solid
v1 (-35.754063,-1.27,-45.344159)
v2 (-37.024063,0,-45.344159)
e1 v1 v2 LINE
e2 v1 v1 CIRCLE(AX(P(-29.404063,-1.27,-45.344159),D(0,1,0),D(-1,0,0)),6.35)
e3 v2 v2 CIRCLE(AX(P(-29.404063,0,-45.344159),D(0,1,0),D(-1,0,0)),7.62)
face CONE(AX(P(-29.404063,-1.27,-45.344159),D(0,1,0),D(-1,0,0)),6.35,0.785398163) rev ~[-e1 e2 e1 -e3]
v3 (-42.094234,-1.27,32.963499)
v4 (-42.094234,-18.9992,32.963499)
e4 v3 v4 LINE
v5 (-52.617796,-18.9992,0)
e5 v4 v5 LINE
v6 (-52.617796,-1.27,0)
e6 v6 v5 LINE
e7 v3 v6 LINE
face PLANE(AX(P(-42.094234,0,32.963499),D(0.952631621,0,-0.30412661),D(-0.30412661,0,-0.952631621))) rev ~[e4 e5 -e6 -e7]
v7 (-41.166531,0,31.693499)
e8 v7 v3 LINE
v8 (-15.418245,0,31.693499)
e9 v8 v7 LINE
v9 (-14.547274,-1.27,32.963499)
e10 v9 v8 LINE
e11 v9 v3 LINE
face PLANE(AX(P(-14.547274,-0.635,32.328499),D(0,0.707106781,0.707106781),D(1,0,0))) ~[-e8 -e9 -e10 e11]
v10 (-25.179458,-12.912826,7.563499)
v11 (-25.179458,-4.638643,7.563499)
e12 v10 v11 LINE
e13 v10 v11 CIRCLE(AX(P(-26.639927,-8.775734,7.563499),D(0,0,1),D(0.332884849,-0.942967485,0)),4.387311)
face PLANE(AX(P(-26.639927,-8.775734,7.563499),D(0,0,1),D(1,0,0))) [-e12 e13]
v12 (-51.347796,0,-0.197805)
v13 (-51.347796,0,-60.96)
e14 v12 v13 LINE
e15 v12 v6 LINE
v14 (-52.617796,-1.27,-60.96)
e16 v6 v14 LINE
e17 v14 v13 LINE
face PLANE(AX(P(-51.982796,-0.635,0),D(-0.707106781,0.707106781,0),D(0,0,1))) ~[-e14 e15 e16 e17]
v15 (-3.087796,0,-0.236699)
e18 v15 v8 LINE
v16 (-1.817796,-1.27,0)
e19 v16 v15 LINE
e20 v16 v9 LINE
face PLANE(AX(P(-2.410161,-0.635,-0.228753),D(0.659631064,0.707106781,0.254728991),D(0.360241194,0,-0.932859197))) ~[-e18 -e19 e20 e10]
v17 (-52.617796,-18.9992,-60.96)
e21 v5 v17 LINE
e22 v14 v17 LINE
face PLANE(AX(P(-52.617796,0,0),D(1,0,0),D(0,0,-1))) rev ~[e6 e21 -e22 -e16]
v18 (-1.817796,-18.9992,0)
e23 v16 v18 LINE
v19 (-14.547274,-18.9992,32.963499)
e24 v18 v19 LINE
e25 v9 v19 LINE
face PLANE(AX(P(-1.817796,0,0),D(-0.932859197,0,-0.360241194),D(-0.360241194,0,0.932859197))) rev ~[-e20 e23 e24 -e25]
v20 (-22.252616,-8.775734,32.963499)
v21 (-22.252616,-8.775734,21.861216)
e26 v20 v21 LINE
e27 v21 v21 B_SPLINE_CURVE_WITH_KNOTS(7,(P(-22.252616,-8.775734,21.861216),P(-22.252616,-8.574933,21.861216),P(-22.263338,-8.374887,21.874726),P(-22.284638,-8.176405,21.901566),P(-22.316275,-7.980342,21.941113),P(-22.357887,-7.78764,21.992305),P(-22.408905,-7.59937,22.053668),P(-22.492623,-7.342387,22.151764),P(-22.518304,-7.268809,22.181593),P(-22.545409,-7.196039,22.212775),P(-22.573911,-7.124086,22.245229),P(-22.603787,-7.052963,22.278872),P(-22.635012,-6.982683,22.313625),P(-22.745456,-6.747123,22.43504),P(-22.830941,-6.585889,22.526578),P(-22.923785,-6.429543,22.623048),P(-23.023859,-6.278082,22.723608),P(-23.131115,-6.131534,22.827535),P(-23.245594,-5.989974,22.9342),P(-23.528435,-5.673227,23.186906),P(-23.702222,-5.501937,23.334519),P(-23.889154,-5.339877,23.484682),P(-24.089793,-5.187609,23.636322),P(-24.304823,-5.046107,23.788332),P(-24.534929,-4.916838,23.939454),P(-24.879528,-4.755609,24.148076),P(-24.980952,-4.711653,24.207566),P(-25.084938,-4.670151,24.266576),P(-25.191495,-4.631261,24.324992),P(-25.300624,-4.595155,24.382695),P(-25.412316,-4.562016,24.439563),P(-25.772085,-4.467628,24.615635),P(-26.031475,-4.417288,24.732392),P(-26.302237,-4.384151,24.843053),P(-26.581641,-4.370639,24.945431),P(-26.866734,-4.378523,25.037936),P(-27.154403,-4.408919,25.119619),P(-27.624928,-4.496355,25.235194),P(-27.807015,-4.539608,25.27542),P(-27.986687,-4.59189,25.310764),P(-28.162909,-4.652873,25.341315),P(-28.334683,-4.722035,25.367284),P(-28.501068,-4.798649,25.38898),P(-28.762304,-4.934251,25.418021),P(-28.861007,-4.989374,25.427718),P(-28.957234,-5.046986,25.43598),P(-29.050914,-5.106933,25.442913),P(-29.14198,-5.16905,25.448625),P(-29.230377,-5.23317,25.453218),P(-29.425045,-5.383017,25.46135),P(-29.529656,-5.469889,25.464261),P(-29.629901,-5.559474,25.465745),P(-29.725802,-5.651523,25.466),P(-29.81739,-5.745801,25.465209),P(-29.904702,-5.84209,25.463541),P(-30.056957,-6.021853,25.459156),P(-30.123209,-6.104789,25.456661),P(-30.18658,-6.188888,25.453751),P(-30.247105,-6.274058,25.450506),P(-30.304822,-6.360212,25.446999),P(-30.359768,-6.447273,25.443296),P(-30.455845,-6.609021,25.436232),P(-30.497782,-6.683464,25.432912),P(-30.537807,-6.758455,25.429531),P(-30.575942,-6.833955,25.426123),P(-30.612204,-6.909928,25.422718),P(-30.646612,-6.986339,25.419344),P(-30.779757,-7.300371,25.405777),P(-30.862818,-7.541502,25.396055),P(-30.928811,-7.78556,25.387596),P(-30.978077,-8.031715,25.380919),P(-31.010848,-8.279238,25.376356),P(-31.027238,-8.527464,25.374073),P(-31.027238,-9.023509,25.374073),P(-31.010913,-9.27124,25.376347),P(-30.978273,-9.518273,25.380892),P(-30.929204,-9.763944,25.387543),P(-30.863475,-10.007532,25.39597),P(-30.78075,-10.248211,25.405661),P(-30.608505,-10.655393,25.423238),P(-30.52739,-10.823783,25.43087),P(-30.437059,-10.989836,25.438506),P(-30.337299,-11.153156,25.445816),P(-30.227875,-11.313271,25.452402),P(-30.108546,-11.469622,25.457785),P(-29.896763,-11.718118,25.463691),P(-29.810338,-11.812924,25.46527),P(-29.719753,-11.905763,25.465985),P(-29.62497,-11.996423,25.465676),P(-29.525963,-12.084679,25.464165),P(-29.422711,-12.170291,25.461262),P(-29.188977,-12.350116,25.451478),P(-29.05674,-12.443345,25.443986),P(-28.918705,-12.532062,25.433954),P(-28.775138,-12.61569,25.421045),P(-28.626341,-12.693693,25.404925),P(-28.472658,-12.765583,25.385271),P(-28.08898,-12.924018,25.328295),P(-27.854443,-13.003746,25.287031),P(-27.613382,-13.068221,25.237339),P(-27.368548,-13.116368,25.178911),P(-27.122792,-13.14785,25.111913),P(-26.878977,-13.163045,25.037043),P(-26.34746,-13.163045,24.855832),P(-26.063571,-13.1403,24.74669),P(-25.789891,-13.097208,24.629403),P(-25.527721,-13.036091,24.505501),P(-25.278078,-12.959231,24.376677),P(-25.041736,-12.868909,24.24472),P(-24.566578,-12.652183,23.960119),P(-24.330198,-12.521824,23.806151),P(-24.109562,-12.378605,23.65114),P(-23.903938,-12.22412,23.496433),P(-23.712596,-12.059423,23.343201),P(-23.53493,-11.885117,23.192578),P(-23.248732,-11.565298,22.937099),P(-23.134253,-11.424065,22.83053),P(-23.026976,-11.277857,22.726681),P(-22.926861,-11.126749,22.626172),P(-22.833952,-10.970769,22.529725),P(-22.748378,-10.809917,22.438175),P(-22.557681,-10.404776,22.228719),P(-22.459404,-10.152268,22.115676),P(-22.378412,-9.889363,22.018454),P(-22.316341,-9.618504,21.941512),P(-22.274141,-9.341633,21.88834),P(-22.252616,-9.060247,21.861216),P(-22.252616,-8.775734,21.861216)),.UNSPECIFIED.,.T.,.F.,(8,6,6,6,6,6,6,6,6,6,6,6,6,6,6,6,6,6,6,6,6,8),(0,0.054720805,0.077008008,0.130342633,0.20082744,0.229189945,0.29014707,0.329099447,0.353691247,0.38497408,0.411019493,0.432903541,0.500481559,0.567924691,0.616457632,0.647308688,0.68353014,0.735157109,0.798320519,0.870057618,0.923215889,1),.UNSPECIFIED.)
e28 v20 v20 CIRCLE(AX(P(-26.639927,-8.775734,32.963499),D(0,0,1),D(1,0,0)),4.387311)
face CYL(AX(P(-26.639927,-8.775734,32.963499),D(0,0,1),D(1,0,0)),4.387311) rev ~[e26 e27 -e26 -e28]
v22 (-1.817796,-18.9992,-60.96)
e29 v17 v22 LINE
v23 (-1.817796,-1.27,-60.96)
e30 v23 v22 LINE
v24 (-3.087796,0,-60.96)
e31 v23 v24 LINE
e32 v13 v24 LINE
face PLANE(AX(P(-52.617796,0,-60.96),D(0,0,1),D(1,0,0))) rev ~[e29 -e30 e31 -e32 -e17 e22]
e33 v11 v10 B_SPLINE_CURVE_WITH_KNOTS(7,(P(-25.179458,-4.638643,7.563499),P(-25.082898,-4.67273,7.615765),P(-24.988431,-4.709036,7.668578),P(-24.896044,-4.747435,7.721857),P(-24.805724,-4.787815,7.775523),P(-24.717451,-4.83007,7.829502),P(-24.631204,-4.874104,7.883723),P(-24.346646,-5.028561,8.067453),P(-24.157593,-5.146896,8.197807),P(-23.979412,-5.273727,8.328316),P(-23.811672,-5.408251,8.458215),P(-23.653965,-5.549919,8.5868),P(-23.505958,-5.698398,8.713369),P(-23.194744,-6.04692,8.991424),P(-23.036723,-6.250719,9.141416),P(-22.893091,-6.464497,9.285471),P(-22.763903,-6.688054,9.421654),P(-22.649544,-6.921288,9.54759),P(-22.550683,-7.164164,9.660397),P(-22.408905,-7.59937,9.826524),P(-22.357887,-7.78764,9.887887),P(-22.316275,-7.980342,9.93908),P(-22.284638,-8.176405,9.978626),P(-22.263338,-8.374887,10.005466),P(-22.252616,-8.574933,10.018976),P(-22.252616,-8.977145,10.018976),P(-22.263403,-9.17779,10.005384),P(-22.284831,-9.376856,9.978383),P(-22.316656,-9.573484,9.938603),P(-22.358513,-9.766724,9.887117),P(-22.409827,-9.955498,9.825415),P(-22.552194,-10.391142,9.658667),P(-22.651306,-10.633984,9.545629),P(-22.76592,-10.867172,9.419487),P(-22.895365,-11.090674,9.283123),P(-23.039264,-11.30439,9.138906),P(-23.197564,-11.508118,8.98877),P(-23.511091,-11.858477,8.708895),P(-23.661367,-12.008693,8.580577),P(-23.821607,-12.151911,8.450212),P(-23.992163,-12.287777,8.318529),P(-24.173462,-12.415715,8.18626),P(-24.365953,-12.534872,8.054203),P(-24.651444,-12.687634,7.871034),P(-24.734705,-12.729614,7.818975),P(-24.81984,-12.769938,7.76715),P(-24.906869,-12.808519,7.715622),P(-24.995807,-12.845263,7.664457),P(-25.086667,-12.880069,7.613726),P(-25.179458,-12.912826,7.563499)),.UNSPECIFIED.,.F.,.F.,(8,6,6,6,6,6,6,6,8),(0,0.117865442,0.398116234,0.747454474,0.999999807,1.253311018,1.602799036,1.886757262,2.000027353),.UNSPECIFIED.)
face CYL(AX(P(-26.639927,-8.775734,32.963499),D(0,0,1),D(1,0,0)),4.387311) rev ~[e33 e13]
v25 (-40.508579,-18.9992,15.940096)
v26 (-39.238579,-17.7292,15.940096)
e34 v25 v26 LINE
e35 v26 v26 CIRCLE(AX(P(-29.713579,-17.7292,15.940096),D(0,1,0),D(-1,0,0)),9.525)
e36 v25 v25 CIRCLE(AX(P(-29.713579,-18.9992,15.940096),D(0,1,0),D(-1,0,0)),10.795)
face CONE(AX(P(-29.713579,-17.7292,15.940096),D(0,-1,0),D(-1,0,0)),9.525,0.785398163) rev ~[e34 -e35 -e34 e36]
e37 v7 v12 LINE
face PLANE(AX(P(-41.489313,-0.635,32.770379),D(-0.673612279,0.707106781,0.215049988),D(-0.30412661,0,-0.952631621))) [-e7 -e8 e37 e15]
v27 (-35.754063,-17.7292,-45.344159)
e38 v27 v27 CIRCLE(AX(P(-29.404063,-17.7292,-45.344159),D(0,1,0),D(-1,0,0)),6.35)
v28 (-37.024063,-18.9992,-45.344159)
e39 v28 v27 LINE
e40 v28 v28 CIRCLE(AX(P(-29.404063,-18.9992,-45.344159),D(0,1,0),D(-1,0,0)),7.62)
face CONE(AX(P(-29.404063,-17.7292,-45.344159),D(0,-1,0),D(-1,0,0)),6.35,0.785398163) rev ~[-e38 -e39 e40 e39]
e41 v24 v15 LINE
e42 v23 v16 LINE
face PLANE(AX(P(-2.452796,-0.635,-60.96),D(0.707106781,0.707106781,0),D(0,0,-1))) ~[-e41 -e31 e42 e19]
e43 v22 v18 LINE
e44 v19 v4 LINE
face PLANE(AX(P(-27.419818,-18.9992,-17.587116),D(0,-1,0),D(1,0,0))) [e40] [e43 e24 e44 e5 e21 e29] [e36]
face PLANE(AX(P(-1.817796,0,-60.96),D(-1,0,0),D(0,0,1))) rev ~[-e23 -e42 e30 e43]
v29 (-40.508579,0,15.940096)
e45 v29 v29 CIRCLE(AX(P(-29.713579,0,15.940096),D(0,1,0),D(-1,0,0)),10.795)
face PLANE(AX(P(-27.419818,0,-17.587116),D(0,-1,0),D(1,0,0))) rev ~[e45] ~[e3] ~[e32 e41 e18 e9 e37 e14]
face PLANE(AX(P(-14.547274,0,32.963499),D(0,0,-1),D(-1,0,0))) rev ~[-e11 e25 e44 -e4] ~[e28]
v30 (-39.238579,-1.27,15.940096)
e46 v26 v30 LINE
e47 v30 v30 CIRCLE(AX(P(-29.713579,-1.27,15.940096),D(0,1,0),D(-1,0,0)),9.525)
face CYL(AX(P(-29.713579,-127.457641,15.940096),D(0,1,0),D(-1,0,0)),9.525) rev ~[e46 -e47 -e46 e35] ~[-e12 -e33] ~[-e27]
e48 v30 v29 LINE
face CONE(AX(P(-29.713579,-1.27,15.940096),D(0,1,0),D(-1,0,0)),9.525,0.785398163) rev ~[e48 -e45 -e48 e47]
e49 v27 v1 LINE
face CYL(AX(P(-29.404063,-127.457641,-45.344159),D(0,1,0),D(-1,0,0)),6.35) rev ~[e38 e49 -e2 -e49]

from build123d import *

# Parameters (mm, degrees)
F1_DEPTH = 18.9992
F3_D     = 19.05
F4_D     = 12.7
F5_R     = 4.3873111452
F6_DEPTH = 25.4
F7_SIZE  = 1.27


with BuildPart() as f1:
    # F0 (on Front) → F1 (new body)
    with BuildSketch(Plane.XZ):
        Polygon((-52.6177957654, 0), (-52.6177957654, -60.96), (-1.8177957654, -60.96), (-1.8177957654, 0), (-14.5472735167, 32.9634994268), (-34.6658416092, 32.9634994268), (-42.0942343771, 32.9634994268), align=None)
    extrude(amount=F1_DEPTH)

    # F3 (through all)
    with Locations(Plane.XZ.offset(18.9992)):
        with Locations((-29.7135785222, 15.9400962293)):
            Hole(F3_D / 2)

    # F4 (through all)
    with Locations(Plane.XZ.offset(18.9992)):
        with Locations((-29.4040627778, -45.3441590071)):
            Hole(F4_D / 2)

    # F5 (on face) → F6 (cut)
    with BuildSketch(Plane.XY.offset(32.9634994268)):
        with Locations((-26.6399271786, -8.7757343426)):
            Circle(F5_R)
    extrude(amount=-F6_DEPTH, mode=Mode.SUBTRACT)

    # F7
    f7_edges = [f1.edges().sort_by_distance(p)[0] for p in [
        (-47.356015, 0, 16.48175),
        (-52.617796, 0, -30.48),
        (-1.817796, 0, -30.48),
        (-8.182535, 0, 16.48175),
        (-28.320754, 0, 32.963499),
        (-35.754063, -18.9992, -45.344159),
        (-39.238579, -18.9992, 15.940096),
        (-39.238579, 0, 15.940096),
        (-35.754063, 0, -45.344159),
    ]]
    chamfer(f7_edges, length=F7_SIZE)


solid = f1.part
